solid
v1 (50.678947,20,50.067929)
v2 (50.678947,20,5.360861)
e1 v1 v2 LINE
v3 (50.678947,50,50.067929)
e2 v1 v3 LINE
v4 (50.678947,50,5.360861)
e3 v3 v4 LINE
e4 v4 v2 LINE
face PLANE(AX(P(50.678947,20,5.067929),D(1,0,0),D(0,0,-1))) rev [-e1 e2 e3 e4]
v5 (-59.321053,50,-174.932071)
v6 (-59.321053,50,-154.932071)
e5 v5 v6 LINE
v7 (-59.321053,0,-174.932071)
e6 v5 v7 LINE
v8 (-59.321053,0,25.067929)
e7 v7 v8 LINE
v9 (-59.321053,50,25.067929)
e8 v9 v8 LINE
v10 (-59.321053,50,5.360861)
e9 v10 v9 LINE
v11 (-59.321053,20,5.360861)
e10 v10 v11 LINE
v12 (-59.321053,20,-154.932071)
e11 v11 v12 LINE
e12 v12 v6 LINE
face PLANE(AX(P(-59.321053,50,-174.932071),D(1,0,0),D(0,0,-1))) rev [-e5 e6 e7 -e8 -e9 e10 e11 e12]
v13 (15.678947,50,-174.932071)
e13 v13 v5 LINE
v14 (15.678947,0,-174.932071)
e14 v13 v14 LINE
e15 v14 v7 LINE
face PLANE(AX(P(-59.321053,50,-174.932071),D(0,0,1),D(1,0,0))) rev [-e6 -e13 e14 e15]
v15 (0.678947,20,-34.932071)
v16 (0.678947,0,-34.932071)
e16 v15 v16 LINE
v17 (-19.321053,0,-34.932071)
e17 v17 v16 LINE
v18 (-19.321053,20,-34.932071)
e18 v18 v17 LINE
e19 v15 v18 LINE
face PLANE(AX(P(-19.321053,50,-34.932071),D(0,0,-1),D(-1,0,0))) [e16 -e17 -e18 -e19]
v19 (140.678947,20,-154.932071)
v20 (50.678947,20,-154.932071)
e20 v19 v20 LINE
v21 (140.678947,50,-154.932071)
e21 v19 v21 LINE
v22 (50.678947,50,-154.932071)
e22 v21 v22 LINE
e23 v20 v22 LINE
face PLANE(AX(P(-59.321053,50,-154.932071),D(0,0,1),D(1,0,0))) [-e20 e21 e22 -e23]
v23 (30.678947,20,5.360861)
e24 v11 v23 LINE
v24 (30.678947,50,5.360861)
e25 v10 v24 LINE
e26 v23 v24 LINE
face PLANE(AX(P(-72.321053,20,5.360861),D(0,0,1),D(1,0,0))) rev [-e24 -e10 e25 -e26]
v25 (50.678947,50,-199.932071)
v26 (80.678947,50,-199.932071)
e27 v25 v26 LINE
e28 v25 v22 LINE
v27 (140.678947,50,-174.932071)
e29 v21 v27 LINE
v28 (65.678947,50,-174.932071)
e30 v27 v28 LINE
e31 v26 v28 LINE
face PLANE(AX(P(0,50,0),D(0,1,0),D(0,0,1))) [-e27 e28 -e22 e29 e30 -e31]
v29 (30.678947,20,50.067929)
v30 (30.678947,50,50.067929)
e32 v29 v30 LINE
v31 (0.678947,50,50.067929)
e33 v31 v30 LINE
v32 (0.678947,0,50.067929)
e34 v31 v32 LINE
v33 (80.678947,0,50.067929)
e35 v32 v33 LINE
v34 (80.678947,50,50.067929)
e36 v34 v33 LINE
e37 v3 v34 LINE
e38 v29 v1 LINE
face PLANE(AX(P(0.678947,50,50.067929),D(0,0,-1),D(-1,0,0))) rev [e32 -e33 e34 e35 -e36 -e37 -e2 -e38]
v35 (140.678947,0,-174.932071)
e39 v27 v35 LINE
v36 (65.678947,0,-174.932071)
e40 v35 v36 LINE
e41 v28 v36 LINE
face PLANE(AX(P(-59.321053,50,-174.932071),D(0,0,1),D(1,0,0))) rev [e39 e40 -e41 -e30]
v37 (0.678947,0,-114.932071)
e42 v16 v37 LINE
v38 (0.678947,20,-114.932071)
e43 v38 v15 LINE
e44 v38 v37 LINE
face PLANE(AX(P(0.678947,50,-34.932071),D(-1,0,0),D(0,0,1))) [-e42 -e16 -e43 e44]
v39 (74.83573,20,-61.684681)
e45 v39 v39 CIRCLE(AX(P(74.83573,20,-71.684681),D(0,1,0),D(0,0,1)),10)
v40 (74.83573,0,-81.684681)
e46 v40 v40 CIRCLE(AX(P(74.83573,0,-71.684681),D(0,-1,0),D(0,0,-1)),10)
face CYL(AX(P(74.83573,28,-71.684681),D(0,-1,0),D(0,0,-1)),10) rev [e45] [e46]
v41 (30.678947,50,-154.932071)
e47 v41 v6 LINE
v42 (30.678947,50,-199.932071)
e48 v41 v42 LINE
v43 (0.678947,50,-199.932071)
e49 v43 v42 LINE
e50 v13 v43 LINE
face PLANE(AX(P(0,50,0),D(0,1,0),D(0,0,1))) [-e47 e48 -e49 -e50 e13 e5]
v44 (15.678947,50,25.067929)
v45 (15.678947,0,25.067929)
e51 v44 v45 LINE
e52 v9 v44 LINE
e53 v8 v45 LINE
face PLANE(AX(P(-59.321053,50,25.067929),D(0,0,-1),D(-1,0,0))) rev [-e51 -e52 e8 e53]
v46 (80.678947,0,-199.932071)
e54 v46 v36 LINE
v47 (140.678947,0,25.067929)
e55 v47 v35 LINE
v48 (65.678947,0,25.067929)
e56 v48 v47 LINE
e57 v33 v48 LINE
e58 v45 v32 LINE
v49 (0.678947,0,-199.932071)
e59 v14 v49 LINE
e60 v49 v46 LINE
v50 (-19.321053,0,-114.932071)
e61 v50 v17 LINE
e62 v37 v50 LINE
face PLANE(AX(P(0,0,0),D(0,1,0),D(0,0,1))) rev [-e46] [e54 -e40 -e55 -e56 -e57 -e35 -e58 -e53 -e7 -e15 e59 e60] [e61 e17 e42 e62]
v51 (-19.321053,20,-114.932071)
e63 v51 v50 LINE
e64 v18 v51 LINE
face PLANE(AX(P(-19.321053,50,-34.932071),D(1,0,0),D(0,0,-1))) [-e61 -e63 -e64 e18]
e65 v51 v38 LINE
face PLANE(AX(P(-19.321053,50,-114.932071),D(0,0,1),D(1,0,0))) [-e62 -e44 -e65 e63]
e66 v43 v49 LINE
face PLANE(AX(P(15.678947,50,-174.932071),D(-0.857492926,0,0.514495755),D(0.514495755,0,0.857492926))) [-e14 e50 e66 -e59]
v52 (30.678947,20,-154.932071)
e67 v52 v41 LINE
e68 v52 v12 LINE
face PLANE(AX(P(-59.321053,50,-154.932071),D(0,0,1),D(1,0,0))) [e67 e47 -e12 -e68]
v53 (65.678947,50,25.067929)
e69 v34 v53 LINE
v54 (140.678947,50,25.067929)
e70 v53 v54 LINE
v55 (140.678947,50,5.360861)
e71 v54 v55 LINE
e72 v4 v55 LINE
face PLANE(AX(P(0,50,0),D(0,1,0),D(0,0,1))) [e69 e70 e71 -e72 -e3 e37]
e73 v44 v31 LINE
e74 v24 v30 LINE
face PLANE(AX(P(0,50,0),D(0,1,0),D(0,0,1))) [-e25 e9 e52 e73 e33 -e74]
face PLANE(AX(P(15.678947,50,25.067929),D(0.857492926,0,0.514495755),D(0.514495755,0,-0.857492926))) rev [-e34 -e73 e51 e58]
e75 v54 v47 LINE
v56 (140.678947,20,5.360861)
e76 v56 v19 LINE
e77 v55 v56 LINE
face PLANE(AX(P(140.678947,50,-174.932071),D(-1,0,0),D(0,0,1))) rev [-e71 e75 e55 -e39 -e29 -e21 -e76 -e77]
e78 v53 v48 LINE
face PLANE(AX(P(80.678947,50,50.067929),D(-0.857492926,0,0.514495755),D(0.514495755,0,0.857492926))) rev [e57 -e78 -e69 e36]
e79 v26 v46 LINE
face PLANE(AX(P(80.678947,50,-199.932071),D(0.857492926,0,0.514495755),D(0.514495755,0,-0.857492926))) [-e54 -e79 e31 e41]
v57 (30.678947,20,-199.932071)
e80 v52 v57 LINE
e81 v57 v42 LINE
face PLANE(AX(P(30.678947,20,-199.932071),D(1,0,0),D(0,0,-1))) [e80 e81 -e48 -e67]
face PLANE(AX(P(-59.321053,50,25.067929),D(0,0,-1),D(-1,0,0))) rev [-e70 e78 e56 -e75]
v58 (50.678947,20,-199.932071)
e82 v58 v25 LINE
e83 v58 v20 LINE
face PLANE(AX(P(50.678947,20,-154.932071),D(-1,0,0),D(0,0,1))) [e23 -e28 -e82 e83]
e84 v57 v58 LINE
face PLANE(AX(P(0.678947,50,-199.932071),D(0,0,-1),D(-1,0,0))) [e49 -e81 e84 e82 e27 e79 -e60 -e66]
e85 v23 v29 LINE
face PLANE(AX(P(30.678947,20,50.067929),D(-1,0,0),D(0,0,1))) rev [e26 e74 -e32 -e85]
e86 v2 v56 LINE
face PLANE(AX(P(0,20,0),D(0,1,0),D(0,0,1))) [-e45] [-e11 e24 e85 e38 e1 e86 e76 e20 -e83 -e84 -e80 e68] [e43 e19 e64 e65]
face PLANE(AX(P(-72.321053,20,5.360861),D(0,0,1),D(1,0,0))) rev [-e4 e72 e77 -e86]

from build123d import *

# Parameters (mm, degrees)
SKETCH1_W           = 200
SKETCH1_H           = 200
SKETCH1_W_2         = 20
SKETCH1_H_2         = 80
BOSS_EXTRUDE1_DEPTH = 50
SHELL1_START        = 20.678946788
SHELL1_OUTLINE_W    = 30
SHELL1_OUTLINE_H    = 160
SHELL1_DEPTH        = 100
SHELL1_START_2      = -39.321053212
SHELL1_2_OUTLINE_W  = 30
SHELL1_2_OUTLINE_H  = 20
SHELL1_2_DEPTH      = 60
SKETCH4_W           = 60
SKETCH4_H           = 120
CUT_EXTRUDE1_DEPTH  = 30
BOSS_EXTRUDE2_DEPTH = 50
SKETCH6_W           = 20
SKETCH6_H           = 45
CUT_EXTRUDE2_DEPTH  = 30
SKETCH7_R           = 10
CUT_EXTRUDE3_DEPTH  = 28
SKETCH8_W           = 160.292931591
SKETCH8_H           = 30
CUT_EXTRUDE4_DEPTH  = 213


# Read off the part's stored shape, not the designer's step: Shell1
with BuildPart() as part:
    # Sketch1 → Boss-Extrude1 (new body)
    with BuildSketch(Plane(origin=(0, 0, 0), x_dir=(1, 0, 0), z_dir=(0, 1, 0))):
        with Locations((40.678946788, 74.932071062)):
            Rectangle(SKETCH1_W, SKETCH1_H)
        with Locations((-9.321053212, 74.932071062)):
            Rectangle(SKETCH1_W_2, SKETCH1_H_2, mode=Mode.SUBTRACT)
    extrude(amount=BOSS_EXTRUDE1_DEPTH)

    # Shell1 outline → Shell1 (cut)
    with BuildSketch(Plane.YZ.offset(SHELL1_START)):
        with Locations((35, -74.932071062)):
            Rectangle(SHELL1_OUTLINE_W, SHELL1_OUTLINE_H)
    extrude(amount=SHELL1_DEPTH, mode=Mode.SUBTRACT)

    # Shell1 2 outline → Shell1 2 (cut)
    with BuildSketch(Plane.YZ.offset(SHELL1_START_2)):
        with Locations((35, -144.932071062)):
            Rectangle(SHELL1_2_OUTLINE_W, SHELL1_2_OUTLINE_H)
        with Locations((35, -4.932071062)):
            Rectangle(SHELL1_2_OUTLINE_W, SHELL1_2_OUTLINE_H)
    extrude(amount=SHELL1_2_DEPTH, mode=Mode.SUBTRACT)

    # Sketch4 → Cut-Extrude1 (cut)
    with BuildSketch(Plane(origin=(0, 50, 0), x_dir=(1, 0, 0), z_dir=(0, 1, 0))):
        with Locations((-9.321053212, 74.932071062)):
            Rectangle(SKETCH4_W, SKETCH4_H)
    extrude(amount=-CUT_EXTRUDE1_DEPTH, mode=Mode.SUBTRACT)

    # Sketch5 → Boss-Extrude2 (add)
    with BuildSketch(Plane.XZ):
        Polygon((40.678946788, 25.067928938), (15.678946788, 25.067928938), (0.678946788, 50.067928938), (80.678946788, 50.067928938), (65.678946788, 25.067928938), align=None)
    boss_extrude2 = extrude(amount=-BOSS_EXTRUDE2_DEPTH)

    # Sketch6 → Cut-Extrude2 (cut)
    with BuildSketch(Plane(origin=(0, 50, 0), x_dir=(1, 0, 0), z_dir=(0, 1, 0))):
        with Locations((40.678946788, -27.567928938)):
            Rectangle(SKETCH6_W, SKETCH6_H)
    cut_extrude2 = extrude(amount=-CUT_EXTRUDE2_DEPTH, mode=Mode.SUBTRACT)

    # Mirror1: Boss-Extrude2, Cut-Extrude2 across plane
    add(boss_extrude2.mirror(Plane.XY.offset(-74.932071062)))
    add(cut_extrude2.mirror(Plane.XY.offset(-74.932071062)), mode=Mode.SUBTRACT)

    # Sketch7 → Cut-Extrude3 (cut)
    with BuildSketch(Plane(origin=(0, 0, 0), x_dir=(-1, 0, 0), z_dir=(0, -1, 0))):
        with Locations(Location((-74.835730419, 71.684680876, 0), (0, 0, 90))):
            Circle(SKETCH7_R)
    extrude(amount=-CUT_EXTRUDE3_DEPTH, mode=Mode.SUBTRACT)

    # Sketch8 → Cut-Extrude4 (cut)
    with BuildSketch(Plane(origin=(140.678946788, 0, 0), x_dir=(0, 0, -1), z_dir=(1, 0, 0))):
        with Locations((74.785605266, 35)):
            Rectangle(SKETCH8_W, SKETCH8_H)
    extrude(amount=-CUT_EXTRUDE4_DEPTH, mode=Mode.SUBTRACT)


solid = part.part
